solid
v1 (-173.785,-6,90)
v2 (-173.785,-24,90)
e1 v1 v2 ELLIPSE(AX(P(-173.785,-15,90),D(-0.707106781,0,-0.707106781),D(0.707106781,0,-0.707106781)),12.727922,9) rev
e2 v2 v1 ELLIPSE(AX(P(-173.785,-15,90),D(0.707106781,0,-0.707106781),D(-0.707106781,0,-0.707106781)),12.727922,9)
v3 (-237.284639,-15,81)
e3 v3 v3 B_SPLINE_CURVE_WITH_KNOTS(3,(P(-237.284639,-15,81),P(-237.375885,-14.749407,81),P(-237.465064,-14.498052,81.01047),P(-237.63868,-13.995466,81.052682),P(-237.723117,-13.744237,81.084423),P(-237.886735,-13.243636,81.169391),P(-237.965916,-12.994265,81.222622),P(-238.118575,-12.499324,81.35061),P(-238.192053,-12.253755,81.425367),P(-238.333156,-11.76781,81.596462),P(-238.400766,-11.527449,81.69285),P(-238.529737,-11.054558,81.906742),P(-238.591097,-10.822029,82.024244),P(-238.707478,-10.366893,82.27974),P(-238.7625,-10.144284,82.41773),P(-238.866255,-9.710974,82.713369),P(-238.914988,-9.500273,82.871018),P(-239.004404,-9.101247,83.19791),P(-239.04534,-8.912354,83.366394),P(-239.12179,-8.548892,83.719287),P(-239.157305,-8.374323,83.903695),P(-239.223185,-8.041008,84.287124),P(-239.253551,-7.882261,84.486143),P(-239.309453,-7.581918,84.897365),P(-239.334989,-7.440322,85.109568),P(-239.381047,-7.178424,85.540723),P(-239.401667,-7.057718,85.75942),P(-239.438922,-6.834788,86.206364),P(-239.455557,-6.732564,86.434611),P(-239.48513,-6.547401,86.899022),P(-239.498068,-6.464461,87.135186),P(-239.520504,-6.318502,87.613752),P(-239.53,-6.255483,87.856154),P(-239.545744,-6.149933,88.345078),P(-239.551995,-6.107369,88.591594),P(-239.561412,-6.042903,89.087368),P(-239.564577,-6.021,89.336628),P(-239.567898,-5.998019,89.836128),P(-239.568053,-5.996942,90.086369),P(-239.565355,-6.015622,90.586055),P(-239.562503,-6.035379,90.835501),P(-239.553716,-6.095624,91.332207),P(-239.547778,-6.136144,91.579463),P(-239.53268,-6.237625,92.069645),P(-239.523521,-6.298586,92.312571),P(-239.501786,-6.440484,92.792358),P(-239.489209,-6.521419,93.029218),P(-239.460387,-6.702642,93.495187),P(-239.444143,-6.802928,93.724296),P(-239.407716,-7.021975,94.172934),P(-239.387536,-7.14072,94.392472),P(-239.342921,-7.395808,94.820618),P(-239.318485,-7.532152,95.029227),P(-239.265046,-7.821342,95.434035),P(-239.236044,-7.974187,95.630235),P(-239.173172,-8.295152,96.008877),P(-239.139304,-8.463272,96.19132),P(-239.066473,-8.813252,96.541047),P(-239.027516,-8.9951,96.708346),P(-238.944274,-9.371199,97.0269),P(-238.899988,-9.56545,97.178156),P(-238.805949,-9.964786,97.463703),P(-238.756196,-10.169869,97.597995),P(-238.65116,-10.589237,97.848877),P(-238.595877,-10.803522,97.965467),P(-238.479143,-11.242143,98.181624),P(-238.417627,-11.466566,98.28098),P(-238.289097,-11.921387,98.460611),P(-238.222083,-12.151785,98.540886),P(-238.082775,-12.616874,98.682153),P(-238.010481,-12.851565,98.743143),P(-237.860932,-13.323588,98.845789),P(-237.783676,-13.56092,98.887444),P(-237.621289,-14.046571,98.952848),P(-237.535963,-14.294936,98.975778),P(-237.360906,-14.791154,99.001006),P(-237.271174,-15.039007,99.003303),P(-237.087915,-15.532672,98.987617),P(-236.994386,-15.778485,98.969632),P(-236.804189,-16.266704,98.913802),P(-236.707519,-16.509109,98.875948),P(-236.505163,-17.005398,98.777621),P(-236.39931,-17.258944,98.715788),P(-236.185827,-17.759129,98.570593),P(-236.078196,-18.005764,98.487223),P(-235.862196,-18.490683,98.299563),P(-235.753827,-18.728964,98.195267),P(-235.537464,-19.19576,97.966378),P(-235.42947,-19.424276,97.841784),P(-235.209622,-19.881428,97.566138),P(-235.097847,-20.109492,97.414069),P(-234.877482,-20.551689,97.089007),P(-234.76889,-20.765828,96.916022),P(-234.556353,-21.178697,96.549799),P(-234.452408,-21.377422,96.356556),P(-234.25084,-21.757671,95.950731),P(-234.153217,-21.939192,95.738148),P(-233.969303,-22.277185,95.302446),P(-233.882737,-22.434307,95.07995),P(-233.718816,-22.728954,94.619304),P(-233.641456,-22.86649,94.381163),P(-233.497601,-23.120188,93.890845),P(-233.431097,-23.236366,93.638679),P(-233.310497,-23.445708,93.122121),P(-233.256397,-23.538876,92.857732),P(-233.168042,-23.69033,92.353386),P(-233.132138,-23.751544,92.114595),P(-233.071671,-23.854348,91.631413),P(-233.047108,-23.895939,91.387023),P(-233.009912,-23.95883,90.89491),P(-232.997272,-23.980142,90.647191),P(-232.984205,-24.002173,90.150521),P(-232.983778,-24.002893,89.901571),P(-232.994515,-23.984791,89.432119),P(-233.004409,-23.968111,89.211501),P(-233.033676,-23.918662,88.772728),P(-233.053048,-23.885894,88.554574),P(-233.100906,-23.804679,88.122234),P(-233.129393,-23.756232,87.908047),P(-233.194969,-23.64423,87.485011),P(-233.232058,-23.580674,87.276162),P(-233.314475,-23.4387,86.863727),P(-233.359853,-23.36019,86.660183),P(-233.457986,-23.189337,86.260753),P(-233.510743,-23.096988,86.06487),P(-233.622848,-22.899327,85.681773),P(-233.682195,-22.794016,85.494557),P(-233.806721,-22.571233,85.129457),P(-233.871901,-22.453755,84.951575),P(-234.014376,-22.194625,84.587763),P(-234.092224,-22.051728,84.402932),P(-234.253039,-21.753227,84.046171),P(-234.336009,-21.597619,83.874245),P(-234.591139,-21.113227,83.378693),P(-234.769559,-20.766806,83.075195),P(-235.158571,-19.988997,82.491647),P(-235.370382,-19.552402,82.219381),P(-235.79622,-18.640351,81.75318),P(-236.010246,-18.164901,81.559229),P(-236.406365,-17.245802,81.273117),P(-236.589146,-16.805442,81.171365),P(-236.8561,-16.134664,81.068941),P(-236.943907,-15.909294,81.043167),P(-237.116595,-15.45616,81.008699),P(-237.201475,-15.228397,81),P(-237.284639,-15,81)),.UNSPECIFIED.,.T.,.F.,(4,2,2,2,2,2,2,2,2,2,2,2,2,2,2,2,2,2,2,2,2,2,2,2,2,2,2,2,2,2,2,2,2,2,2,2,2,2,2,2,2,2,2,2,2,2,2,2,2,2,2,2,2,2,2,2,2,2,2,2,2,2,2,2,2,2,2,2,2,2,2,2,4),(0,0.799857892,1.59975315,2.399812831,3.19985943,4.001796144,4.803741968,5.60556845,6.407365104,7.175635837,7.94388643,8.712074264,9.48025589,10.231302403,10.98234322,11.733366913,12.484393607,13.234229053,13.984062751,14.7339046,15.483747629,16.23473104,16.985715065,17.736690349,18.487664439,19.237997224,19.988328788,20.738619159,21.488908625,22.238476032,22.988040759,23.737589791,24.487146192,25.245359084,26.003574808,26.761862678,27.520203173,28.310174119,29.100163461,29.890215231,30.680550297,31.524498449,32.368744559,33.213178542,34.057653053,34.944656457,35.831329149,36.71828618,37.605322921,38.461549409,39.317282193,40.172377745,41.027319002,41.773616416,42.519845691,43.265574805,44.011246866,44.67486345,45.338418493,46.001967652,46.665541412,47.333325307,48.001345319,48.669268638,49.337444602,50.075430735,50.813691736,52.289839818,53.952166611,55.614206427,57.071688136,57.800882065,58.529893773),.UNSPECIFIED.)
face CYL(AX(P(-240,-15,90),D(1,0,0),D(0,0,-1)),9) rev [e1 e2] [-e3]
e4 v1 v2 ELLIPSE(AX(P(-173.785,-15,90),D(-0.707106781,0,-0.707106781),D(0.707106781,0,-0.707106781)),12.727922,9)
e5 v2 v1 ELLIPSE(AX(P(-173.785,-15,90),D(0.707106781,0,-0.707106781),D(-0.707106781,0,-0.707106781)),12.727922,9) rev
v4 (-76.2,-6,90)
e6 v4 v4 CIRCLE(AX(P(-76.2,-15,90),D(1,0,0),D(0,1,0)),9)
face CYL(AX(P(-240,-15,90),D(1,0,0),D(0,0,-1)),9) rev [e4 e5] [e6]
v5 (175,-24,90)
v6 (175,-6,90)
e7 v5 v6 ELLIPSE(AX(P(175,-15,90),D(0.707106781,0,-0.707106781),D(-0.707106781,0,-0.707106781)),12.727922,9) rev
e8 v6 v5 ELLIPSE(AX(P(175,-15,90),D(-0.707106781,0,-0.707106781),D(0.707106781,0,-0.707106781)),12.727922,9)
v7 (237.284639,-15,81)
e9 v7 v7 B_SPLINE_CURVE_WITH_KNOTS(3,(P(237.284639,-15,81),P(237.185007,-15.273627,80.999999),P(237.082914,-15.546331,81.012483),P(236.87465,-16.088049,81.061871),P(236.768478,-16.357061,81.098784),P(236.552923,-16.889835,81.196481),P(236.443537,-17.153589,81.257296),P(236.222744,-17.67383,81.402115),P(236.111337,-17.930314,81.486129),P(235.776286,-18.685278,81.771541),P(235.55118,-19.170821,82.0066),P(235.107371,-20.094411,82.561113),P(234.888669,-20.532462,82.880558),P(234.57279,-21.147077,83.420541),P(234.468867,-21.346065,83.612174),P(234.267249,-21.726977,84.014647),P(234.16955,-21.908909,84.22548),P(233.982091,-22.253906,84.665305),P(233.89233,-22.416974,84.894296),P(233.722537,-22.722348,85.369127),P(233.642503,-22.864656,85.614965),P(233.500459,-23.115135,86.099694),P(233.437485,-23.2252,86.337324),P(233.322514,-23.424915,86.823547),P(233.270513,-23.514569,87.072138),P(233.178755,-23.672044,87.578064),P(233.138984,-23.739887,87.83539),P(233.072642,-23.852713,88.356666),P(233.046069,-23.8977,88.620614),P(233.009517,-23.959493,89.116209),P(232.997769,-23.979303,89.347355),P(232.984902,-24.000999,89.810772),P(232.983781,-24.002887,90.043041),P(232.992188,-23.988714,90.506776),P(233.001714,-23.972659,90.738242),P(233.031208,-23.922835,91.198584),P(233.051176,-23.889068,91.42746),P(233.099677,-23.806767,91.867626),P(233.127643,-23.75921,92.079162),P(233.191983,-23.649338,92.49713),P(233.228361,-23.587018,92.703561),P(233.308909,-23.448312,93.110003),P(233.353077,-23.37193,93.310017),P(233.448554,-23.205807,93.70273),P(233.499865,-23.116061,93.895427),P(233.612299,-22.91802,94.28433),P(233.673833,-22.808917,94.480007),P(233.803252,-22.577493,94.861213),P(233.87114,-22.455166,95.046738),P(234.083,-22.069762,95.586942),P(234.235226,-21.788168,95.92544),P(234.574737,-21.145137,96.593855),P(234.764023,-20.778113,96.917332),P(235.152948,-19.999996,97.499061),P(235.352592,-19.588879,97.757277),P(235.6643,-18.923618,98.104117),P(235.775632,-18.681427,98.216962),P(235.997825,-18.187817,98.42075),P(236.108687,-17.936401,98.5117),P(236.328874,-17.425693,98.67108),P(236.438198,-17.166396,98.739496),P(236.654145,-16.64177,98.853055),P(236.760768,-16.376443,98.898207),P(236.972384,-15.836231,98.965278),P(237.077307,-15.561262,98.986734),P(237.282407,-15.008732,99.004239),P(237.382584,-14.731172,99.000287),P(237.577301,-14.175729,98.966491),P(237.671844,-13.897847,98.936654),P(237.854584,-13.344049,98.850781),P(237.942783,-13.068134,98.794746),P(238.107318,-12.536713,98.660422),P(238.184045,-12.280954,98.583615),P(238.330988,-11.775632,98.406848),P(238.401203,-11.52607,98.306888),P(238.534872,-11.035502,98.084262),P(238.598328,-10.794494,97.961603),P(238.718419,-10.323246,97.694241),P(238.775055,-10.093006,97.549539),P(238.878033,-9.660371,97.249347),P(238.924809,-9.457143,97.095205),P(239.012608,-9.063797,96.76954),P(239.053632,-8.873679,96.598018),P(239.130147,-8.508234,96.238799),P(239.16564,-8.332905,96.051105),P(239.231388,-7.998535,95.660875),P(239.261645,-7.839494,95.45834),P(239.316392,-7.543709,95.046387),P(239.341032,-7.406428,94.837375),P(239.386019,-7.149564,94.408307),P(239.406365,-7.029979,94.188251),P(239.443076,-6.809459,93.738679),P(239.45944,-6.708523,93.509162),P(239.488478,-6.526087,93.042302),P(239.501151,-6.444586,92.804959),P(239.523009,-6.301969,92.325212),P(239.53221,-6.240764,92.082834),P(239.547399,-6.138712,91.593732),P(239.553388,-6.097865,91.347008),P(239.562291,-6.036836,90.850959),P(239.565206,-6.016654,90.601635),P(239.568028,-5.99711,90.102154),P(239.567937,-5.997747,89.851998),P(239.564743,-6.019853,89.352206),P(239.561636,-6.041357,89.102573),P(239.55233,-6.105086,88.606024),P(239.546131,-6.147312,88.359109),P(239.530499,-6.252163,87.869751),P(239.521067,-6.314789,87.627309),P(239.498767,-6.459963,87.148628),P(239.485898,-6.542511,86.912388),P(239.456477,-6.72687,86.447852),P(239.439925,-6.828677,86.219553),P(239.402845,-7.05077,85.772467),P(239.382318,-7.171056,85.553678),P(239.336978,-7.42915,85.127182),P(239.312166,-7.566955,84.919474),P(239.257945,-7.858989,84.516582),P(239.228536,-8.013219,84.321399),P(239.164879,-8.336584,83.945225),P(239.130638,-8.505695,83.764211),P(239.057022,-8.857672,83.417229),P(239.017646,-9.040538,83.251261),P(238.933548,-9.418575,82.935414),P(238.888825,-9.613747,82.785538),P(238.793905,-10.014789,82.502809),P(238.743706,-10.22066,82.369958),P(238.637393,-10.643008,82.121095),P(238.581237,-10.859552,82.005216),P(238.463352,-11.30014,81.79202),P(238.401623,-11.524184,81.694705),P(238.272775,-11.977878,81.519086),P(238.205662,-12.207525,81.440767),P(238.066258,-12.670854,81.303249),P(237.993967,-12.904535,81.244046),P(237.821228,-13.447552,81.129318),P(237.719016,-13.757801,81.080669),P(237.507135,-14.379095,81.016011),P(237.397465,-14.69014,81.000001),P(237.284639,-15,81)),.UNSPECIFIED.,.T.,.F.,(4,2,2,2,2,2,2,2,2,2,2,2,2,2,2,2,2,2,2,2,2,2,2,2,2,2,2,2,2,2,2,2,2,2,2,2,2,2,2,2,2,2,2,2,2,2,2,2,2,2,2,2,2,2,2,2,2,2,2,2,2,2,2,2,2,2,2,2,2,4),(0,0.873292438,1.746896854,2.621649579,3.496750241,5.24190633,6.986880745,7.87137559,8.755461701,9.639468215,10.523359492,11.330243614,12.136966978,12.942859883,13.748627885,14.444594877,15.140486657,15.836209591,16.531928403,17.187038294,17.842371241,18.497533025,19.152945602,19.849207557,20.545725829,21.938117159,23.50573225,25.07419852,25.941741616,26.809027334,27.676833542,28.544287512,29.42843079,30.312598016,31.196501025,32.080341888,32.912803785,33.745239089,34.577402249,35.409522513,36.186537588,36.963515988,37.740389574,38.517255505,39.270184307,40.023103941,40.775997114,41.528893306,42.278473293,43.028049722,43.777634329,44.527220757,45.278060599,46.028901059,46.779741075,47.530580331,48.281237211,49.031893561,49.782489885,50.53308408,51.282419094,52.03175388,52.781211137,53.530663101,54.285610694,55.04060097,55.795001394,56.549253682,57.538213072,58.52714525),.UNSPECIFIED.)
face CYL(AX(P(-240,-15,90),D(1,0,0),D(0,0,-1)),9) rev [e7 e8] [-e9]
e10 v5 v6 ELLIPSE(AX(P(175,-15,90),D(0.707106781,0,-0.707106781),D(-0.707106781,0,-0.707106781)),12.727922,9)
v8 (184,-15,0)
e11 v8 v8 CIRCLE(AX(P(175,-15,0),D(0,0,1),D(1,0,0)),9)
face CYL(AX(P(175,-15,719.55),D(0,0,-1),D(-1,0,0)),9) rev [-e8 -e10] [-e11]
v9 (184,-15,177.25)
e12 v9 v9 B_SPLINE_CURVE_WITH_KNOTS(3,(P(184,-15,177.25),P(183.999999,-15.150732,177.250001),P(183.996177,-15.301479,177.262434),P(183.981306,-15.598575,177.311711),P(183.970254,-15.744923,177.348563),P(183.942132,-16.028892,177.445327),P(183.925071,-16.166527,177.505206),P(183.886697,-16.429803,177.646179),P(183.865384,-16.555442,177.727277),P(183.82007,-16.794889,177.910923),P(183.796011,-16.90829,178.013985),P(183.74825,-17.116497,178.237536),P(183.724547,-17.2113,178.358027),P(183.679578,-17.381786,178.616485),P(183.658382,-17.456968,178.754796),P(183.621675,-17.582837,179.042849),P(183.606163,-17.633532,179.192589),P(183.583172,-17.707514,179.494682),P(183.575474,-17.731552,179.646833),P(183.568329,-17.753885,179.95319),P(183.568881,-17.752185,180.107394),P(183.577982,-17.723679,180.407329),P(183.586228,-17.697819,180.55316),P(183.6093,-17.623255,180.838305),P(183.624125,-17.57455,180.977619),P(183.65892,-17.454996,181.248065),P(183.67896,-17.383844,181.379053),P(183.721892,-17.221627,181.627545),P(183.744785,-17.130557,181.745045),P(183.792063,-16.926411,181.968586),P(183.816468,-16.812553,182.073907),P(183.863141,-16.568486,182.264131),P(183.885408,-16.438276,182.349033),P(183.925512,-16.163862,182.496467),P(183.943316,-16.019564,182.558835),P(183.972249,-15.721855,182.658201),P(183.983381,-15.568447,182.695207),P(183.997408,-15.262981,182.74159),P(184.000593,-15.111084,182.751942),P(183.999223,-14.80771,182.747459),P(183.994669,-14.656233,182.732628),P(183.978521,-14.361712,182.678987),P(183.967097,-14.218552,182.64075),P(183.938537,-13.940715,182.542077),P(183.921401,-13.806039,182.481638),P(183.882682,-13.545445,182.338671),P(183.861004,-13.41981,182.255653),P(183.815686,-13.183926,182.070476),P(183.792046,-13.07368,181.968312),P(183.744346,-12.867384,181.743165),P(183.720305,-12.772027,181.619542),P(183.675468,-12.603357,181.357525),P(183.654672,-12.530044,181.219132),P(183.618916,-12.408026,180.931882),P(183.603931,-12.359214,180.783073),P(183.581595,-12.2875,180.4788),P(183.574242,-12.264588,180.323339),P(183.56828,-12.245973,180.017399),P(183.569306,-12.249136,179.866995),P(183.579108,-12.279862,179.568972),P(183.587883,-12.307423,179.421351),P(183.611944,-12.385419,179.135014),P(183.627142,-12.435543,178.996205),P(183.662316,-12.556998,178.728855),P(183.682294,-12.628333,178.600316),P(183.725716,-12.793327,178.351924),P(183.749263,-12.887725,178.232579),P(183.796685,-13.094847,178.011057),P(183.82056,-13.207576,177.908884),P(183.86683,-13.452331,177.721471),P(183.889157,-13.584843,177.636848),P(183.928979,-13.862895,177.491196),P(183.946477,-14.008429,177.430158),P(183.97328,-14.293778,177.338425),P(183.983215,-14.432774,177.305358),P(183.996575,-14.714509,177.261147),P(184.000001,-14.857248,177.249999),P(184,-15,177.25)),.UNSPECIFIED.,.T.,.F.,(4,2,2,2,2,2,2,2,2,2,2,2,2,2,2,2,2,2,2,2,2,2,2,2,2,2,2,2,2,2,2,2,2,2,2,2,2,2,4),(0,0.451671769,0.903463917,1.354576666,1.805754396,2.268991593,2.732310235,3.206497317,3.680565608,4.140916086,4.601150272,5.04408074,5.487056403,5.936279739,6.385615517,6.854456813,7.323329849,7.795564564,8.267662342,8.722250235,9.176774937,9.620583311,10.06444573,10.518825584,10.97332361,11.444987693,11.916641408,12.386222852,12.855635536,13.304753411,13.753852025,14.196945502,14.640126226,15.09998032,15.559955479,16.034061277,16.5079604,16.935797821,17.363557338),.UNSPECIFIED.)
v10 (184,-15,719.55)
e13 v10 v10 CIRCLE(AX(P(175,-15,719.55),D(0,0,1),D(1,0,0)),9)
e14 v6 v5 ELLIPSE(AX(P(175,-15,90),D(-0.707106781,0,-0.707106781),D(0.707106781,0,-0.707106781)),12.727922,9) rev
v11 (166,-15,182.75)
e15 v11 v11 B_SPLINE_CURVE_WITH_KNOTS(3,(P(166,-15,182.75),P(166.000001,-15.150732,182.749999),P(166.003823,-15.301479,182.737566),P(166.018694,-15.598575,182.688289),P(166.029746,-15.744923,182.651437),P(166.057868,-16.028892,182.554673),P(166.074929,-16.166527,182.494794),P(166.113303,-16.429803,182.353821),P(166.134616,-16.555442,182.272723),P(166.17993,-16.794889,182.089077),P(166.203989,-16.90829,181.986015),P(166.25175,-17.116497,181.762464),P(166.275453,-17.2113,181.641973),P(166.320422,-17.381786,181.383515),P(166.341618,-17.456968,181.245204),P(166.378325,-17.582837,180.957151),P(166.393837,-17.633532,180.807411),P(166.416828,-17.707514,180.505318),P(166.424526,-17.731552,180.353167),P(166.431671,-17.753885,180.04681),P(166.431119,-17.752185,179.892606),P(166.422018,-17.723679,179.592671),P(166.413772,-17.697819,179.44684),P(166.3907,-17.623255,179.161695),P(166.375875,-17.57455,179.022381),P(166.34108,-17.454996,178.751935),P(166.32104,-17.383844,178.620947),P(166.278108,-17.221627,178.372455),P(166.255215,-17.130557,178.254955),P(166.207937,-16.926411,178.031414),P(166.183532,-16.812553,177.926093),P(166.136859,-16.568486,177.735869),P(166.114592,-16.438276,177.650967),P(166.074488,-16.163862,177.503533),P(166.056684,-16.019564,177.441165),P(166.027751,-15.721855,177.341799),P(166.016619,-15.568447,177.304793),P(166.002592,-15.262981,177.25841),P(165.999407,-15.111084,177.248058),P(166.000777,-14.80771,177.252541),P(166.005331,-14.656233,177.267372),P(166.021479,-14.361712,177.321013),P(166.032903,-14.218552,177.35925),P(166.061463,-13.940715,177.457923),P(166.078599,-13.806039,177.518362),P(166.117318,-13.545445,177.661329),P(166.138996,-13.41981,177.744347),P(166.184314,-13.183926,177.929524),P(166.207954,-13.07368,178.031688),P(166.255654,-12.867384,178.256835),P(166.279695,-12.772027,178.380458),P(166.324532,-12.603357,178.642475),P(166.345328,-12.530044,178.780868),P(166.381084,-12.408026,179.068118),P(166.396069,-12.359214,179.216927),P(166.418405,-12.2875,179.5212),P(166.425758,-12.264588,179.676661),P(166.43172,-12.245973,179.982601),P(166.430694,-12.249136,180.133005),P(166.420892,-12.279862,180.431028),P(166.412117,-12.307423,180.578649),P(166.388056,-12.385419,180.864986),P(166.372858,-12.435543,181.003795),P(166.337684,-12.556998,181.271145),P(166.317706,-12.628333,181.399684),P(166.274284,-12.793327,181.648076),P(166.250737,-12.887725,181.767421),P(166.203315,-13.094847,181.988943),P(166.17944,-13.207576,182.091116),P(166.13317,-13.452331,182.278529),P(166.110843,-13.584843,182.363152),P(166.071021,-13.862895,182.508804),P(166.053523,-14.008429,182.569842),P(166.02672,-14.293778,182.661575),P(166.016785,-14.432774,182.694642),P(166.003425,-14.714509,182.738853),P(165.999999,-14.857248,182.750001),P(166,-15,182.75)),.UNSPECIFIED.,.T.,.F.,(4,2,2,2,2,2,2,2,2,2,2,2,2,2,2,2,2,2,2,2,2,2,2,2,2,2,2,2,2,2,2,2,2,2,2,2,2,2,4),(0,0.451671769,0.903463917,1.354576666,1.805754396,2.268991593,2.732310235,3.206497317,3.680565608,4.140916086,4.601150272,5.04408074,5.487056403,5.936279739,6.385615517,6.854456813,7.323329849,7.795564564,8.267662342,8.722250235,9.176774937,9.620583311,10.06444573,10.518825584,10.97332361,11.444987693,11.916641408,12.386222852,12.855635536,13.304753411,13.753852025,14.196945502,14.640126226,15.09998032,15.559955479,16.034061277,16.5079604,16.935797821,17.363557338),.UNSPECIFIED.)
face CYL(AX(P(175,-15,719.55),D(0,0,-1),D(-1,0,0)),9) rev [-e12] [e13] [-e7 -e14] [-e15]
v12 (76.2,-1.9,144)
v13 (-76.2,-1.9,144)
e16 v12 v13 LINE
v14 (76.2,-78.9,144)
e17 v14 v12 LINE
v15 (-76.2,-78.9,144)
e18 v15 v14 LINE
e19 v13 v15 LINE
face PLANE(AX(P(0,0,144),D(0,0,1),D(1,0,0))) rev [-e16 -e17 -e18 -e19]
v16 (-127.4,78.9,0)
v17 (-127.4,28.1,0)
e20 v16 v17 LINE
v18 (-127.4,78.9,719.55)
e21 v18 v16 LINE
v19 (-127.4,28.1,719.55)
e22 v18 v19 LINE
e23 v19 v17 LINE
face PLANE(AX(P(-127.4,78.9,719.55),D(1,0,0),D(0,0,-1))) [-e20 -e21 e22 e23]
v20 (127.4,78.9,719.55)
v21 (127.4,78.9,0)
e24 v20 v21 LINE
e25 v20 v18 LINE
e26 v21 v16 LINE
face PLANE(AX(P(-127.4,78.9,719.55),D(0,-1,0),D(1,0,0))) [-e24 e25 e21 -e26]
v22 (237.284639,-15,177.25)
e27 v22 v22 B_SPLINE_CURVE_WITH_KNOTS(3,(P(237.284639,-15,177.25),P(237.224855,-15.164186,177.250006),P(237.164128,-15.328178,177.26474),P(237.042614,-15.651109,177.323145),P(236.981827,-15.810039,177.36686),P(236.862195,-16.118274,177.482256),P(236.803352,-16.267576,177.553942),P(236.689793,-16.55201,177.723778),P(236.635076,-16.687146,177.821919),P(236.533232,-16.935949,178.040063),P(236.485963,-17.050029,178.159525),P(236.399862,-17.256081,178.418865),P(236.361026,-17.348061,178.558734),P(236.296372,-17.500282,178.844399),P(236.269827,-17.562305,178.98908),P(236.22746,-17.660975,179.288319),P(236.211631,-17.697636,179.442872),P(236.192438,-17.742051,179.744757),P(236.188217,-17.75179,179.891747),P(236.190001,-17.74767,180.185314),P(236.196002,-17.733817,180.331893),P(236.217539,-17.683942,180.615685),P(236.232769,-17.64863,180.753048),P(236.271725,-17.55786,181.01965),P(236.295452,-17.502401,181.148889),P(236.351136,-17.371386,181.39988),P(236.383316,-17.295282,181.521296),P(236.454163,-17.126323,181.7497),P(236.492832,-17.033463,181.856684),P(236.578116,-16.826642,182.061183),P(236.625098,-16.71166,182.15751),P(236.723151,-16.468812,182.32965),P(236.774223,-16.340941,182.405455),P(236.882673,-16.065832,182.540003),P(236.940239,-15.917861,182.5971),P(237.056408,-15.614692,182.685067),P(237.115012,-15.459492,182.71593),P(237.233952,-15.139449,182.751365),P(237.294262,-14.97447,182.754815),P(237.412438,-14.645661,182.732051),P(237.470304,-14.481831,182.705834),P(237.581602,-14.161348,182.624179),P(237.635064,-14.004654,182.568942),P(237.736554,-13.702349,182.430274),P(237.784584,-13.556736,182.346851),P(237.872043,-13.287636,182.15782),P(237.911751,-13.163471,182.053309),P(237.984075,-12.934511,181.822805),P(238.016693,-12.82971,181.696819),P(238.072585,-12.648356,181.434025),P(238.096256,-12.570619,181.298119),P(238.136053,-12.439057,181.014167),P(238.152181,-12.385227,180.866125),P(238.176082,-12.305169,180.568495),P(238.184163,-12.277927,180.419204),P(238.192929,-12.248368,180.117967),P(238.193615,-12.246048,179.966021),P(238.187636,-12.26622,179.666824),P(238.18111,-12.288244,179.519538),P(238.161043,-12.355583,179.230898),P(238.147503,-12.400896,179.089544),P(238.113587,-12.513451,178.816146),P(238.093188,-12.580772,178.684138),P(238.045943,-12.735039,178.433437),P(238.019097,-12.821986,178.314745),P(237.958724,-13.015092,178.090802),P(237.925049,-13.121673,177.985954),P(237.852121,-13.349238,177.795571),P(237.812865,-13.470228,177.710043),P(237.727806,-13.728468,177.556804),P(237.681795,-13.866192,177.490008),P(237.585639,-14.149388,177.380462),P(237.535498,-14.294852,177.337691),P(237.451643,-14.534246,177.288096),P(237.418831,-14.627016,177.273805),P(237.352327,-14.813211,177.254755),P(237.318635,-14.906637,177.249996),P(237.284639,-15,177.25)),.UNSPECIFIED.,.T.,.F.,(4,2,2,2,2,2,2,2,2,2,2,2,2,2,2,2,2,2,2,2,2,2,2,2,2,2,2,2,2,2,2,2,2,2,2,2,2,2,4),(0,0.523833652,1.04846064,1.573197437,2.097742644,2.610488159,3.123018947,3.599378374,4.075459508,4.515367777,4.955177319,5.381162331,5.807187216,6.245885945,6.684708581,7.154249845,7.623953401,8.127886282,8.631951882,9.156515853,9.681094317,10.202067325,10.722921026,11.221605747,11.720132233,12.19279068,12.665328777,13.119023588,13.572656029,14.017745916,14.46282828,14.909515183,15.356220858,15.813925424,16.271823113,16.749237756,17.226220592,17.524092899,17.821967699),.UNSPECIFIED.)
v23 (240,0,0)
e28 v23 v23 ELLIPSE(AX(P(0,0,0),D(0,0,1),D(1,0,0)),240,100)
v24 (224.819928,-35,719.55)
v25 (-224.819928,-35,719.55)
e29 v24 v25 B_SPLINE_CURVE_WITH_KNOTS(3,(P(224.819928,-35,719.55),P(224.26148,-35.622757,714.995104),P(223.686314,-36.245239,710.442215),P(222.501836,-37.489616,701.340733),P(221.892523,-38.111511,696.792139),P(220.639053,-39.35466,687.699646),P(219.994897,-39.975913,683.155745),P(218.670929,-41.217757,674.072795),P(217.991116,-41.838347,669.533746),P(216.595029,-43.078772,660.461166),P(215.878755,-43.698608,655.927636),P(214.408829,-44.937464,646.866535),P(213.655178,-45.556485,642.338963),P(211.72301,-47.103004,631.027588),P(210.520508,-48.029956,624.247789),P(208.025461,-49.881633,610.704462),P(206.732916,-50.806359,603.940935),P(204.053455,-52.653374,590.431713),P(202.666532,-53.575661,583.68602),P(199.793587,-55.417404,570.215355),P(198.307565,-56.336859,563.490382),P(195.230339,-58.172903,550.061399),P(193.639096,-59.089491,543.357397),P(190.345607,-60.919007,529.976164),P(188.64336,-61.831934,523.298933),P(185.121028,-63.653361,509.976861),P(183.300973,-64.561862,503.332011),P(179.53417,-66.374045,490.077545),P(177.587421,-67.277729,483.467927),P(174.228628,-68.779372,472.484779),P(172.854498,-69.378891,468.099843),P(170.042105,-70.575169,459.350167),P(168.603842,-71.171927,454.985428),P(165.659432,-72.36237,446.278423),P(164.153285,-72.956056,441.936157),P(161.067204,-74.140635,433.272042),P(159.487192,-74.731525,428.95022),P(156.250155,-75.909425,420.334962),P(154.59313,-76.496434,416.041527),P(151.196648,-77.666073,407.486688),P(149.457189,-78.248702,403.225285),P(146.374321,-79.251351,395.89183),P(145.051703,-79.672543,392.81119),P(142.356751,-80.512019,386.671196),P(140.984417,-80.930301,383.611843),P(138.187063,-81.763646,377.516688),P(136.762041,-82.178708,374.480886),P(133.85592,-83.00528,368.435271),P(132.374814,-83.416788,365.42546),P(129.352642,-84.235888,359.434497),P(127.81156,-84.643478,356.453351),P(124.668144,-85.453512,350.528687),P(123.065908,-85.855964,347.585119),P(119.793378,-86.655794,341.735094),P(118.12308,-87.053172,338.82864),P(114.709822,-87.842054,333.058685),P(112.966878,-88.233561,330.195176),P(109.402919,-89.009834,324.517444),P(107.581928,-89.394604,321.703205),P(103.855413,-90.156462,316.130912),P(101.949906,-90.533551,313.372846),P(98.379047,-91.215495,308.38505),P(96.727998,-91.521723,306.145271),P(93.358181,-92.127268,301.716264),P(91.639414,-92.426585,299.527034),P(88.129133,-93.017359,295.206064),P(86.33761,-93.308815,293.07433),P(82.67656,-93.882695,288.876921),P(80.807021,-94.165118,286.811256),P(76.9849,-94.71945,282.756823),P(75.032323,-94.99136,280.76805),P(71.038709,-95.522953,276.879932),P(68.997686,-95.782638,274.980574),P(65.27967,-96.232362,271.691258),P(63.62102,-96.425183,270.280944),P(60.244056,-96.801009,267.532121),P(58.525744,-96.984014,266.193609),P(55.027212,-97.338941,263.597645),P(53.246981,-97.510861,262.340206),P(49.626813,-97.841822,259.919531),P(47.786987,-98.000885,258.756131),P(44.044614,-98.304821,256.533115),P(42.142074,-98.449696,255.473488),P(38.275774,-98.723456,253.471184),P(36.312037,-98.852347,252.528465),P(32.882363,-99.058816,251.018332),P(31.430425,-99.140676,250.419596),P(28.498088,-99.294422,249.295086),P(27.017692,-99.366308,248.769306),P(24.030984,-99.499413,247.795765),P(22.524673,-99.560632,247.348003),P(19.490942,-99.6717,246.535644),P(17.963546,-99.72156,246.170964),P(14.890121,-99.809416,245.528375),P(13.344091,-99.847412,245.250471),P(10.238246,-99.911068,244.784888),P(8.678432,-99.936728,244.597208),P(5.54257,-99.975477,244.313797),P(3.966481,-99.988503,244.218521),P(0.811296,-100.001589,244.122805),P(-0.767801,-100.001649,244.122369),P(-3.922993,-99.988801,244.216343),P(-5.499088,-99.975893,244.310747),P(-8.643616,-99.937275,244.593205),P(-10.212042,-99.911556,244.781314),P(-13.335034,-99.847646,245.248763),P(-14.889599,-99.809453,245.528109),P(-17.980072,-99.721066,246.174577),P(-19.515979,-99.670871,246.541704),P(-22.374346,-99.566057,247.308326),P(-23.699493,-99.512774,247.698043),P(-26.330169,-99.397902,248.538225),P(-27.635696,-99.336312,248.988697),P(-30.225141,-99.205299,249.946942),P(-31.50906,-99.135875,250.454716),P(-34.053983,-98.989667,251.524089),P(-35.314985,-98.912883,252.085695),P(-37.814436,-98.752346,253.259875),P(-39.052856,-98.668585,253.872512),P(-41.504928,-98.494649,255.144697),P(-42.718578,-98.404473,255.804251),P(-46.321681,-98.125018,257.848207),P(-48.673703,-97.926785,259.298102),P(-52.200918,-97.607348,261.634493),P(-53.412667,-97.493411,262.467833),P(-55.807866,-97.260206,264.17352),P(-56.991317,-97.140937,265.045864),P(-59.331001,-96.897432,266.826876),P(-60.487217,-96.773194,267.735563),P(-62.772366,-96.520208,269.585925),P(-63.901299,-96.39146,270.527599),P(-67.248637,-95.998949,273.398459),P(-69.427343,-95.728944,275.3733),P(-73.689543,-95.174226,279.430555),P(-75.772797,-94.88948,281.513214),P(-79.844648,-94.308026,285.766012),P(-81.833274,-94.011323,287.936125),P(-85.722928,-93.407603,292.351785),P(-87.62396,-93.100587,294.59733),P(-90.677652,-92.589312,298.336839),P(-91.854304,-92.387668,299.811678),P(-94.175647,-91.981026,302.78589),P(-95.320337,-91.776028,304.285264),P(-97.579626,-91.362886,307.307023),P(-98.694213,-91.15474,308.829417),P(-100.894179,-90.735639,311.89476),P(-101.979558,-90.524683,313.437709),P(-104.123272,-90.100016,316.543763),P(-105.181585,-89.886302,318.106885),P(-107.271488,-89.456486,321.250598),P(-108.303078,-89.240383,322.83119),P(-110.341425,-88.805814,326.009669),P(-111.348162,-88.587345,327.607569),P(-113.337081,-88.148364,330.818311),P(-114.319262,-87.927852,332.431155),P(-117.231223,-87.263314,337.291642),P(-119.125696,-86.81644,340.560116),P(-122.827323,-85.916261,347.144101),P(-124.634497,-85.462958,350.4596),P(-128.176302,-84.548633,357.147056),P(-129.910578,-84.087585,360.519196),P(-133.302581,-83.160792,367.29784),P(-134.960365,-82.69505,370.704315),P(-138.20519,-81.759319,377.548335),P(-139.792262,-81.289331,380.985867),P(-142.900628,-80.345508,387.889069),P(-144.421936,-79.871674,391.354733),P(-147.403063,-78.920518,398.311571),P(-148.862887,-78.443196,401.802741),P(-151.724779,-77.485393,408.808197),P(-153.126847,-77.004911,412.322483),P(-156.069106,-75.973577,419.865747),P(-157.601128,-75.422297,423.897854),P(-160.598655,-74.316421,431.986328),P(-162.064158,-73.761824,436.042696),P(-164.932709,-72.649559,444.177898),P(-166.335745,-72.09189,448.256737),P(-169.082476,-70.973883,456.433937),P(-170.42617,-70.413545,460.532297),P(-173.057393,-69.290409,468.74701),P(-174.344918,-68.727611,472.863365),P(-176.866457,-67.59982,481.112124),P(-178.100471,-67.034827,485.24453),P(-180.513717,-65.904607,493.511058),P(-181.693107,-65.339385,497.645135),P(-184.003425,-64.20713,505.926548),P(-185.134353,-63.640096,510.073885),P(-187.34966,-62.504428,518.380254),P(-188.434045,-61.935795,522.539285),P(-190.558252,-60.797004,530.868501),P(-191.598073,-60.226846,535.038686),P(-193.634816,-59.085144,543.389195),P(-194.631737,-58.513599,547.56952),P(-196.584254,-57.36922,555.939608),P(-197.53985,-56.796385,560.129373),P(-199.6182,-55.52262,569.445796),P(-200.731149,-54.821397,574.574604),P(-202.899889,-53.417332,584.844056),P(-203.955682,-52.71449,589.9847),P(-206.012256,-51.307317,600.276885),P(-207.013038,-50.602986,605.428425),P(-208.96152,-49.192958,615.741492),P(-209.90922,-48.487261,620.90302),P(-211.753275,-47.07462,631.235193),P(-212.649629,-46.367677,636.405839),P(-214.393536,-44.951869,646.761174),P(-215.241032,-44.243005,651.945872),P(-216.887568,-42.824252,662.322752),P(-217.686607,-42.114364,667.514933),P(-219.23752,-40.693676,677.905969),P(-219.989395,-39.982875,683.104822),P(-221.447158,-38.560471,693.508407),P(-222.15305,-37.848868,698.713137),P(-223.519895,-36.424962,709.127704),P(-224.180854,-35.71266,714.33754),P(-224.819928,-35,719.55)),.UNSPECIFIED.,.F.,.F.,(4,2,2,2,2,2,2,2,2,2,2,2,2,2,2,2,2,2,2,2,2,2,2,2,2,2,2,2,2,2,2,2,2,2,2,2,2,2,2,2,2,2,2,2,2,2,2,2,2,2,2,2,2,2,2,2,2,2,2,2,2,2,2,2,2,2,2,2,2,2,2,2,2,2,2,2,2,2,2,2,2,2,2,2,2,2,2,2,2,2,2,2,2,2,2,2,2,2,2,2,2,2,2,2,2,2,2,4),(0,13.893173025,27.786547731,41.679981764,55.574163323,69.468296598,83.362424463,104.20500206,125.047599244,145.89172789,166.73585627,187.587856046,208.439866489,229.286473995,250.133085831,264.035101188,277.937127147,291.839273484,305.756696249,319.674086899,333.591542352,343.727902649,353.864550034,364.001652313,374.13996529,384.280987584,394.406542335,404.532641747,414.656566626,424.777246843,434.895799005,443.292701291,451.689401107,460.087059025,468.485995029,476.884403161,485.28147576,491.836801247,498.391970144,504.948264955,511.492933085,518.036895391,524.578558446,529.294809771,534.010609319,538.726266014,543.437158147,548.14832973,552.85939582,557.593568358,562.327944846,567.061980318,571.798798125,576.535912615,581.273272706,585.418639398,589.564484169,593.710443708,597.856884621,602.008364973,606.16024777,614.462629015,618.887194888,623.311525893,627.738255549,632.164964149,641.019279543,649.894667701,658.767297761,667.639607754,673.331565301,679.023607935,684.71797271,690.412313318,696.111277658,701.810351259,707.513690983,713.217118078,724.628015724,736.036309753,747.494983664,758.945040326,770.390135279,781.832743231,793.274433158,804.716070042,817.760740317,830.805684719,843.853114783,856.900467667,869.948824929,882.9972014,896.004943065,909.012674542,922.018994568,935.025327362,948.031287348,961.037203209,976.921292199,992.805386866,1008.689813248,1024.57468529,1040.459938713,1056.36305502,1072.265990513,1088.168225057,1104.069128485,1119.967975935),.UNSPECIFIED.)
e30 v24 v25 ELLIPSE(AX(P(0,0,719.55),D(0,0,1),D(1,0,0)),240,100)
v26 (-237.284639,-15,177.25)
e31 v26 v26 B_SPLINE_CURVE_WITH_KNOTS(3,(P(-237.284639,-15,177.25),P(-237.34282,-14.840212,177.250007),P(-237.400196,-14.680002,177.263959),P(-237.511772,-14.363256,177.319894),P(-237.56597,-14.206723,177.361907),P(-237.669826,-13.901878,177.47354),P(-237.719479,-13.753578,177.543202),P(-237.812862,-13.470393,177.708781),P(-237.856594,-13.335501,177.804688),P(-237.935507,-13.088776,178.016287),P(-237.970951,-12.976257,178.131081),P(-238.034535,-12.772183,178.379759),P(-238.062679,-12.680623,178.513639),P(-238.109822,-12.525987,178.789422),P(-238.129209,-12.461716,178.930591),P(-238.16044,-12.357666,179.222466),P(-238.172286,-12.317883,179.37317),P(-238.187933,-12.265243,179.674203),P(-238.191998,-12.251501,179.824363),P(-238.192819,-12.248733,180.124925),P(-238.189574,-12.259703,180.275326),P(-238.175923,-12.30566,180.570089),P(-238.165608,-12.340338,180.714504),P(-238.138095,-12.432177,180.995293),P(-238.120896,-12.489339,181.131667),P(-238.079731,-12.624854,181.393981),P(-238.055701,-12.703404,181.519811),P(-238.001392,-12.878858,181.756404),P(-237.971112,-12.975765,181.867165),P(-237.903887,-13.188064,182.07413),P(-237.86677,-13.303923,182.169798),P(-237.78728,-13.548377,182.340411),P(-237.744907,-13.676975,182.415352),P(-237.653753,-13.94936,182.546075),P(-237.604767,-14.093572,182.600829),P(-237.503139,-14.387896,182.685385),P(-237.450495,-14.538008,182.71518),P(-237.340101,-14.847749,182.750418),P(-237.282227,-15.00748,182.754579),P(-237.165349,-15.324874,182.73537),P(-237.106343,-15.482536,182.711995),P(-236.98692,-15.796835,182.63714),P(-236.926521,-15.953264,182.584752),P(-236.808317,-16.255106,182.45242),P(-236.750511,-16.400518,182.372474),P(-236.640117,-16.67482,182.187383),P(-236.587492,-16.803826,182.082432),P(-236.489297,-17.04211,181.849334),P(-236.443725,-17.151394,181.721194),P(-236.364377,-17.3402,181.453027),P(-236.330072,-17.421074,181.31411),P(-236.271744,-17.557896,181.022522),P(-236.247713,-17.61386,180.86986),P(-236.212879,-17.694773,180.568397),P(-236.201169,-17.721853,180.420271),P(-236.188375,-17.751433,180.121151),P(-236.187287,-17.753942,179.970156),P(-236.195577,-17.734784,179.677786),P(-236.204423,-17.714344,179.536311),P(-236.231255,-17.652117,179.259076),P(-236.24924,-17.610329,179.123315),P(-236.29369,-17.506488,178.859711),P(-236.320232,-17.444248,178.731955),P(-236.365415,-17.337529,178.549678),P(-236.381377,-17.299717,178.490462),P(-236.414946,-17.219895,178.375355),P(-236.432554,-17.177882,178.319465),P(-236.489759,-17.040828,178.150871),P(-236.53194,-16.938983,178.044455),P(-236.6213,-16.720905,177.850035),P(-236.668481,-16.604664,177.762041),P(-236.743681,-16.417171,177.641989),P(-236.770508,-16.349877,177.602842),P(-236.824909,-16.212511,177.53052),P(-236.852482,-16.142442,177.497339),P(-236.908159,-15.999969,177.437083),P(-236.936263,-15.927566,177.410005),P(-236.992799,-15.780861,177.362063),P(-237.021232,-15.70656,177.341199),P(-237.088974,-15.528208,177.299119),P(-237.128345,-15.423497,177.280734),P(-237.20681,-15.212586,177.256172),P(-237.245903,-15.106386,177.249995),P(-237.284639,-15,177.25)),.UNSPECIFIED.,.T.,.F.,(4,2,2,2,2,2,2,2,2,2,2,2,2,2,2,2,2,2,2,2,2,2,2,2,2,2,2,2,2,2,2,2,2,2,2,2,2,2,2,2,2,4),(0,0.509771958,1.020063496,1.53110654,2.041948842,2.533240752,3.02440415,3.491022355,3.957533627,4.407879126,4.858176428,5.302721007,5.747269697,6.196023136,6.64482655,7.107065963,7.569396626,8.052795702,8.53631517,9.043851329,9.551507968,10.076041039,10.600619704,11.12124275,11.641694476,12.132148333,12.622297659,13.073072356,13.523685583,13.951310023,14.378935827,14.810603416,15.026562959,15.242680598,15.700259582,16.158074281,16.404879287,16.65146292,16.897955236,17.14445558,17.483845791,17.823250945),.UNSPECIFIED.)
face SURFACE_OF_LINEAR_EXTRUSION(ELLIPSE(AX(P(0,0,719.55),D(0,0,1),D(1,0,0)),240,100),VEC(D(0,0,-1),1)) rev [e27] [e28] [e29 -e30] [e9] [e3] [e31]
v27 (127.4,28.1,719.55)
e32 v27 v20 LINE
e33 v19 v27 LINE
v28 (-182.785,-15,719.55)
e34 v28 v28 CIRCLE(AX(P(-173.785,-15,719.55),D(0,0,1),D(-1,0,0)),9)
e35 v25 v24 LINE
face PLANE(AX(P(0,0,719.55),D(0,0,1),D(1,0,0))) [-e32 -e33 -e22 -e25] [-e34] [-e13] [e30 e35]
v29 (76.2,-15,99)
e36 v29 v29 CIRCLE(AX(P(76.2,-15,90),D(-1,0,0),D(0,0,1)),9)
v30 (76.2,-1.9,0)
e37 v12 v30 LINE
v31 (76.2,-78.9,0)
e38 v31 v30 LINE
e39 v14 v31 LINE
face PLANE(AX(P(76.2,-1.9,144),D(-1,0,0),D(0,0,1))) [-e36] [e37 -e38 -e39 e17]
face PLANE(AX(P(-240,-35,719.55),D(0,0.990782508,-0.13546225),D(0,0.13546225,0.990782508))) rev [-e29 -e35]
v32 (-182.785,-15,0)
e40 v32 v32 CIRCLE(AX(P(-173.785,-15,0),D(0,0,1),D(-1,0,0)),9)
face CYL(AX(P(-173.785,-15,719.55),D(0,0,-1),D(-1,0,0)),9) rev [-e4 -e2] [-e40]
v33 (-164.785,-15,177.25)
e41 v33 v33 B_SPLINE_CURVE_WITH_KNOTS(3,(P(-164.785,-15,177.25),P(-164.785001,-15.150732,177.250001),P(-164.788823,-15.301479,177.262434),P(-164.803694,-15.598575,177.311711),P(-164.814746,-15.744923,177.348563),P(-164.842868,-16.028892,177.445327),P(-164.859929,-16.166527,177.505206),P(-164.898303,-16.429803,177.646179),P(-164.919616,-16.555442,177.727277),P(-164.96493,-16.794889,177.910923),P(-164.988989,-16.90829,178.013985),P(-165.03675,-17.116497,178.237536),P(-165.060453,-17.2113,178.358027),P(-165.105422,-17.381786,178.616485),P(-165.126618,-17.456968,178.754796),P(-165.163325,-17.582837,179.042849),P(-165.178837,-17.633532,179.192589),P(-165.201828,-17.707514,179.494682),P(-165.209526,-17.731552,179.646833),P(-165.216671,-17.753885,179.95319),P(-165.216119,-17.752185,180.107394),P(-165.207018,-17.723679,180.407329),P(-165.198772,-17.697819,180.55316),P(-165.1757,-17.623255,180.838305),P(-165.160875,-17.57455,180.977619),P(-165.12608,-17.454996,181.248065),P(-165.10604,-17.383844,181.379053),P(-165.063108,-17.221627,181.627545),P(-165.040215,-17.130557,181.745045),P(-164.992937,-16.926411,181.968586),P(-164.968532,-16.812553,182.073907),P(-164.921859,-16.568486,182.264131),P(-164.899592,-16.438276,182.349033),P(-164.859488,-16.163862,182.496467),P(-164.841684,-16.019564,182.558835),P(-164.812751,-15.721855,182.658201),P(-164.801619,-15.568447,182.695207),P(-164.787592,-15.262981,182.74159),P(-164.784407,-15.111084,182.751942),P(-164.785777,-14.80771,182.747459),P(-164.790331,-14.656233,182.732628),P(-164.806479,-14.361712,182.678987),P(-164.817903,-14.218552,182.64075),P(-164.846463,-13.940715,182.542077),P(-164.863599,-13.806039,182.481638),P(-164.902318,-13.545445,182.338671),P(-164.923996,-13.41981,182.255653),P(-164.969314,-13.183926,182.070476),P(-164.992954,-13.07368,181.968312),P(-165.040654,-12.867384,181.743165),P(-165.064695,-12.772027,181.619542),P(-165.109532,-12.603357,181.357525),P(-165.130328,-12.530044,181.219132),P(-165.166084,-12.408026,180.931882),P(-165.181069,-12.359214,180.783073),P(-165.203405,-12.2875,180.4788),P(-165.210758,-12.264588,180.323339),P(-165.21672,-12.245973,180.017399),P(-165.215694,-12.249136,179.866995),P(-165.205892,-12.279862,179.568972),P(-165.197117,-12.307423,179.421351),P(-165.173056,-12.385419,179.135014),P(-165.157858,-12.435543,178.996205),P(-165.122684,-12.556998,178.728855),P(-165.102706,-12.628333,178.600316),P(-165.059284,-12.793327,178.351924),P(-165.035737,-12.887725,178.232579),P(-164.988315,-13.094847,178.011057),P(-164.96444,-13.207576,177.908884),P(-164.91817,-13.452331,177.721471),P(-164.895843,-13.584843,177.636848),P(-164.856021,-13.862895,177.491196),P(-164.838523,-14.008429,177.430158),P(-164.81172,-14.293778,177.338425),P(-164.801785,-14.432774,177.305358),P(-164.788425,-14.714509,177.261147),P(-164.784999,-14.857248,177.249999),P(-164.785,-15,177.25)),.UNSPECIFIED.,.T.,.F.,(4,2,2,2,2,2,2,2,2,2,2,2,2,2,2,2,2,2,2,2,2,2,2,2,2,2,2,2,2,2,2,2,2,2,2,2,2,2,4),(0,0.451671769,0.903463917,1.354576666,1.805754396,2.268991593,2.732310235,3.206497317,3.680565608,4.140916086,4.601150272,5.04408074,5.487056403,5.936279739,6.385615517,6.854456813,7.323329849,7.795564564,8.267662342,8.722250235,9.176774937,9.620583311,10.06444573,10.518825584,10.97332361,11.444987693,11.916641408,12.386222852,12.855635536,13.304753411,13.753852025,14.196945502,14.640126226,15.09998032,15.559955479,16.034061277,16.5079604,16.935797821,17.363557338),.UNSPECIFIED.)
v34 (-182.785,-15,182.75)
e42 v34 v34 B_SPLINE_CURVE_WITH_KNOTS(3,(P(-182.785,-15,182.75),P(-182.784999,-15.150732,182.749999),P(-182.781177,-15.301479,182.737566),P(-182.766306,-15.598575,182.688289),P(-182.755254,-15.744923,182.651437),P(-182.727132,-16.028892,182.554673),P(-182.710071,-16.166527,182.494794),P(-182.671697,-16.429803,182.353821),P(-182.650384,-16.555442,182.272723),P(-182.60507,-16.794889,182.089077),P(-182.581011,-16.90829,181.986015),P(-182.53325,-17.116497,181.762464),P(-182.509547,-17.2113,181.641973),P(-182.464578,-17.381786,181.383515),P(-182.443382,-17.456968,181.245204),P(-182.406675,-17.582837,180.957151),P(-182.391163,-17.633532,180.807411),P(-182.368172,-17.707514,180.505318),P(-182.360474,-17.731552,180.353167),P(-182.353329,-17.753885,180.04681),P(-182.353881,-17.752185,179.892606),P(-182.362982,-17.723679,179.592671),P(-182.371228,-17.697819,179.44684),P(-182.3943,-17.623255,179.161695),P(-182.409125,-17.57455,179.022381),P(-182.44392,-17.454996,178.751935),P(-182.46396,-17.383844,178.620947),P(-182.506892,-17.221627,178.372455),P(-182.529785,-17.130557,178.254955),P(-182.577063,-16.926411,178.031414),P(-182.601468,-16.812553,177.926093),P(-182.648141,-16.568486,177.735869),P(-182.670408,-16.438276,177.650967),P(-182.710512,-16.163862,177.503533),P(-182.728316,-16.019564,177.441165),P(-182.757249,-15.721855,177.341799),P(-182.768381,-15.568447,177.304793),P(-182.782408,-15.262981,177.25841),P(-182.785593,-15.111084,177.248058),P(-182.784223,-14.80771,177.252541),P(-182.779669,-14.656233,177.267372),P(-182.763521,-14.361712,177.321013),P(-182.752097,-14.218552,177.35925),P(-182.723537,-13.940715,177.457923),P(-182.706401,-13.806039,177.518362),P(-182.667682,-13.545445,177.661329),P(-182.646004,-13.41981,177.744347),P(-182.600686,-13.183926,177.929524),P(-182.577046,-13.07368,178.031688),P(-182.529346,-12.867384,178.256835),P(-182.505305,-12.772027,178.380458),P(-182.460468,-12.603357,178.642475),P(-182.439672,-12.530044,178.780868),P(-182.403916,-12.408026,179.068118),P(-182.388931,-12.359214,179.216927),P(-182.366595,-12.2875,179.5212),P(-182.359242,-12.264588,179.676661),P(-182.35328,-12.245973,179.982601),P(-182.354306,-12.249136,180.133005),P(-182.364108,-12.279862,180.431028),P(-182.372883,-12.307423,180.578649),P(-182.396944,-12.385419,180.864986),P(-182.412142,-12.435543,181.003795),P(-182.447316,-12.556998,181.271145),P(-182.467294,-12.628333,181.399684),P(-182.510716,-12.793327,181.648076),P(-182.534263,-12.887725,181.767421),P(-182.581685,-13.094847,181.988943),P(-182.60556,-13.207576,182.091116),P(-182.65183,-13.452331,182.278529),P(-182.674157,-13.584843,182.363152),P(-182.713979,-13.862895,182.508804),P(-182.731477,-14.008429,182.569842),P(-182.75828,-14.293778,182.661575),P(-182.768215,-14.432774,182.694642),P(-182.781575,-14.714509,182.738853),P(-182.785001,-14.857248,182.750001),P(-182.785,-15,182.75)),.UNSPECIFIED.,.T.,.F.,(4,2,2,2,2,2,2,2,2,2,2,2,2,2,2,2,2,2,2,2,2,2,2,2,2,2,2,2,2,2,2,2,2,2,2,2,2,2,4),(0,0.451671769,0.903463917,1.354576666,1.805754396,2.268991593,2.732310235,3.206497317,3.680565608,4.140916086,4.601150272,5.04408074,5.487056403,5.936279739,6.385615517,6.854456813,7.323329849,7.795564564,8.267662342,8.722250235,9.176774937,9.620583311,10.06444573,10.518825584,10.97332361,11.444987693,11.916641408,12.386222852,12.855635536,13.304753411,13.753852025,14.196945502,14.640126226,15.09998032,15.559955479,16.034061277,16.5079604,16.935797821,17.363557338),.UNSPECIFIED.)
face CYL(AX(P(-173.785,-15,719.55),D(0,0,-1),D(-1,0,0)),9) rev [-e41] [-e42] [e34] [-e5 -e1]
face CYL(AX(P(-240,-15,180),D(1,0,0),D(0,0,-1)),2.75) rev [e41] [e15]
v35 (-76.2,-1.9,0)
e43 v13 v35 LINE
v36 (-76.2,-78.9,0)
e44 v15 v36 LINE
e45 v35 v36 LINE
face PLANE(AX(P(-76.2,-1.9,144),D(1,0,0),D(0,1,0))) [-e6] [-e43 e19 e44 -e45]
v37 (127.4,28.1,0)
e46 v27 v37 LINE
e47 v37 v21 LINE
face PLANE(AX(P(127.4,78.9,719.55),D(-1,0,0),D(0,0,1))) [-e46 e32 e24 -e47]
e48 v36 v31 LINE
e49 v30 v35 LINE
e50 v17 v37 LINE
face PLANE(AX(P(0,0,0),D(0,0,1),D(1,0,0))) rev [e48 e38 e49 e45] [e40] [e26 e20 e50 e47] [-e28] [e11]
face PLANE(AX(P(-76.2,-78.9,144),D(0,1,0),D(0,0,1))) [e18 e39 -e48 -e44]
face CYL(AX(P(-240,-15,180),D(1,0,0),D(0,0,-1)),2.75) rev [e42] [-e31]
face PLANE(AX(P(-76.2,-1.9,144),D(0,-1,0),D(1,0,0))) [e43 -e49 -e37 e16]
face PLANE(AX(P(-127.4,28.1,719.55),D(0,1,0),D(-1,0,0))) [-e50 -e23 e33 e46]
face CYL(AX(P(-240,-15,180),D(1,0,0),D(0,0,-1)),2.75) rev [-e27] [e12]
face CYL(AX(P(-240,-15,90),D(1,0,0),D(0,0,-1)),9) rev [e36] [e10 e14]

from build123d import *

# Parameters (mm, degrees)
SKETCH1_RX               = 240
SKETCH1_RY               = 100
SKETCH1_R                = 9
SKETCH1_W                = 254.8
SKETCH1_H                = 50.8
BOSS_EXTRUDE1_DEPTH      = 719.55
CUT_EXTRUDE1_DEPTH       = 766.083134372
CUT_EXTRUDE1_DEPTH_BACK  = 766.083134372
SKETCH7_W                = 152.4
SKETCH7_H                = 77
CUT_EXTRUDE2_DEPTH       = 144
CUT_EXTRUDE3_START       = -241
CUT_EXTRUDE3_OUTLINE_R   = 9
CUT_EXTRUDE3_OUTLINE_R_2 = 2.75
CUT_EXTRUDE3_DEPTH       = 482


with BuildPart() as part:
    # Sketch1 → Boss-Extrude1 (new body)
    with BuildSketch(Plane.XY):
        with Locations((0, 0)):
            Ellipse(SKETCH1_RX, SKETCH1_RY)
        with Locations((175, -15)):
            Circle(SKETCH1_R, mode=Mode.SUBTRACT)
        with Locations(Location((-173.785, -15, 0), (0, 0, 180))):
            Circle(SKETCH1_R, mode=Mode.SUBTRACT)
        with Locations((0, 53.5)):
            Rectangle(SKETCH1_W, SKETCH1_H, mode=Mode.SUBTRACT)
    extrude(amount=BOSS_EXTRUDE1_DEPTH)

    # Sketch3 → Cut-Extrude1 (cut, two sides: drawn at the far end of the back side and taken through both)
    with BuildSketch(Plane(origin=(0, 0, 0), x_dir=(0, 0, -1), z_dir=(1, 0, 0)).offset(-CUT_EXTRUDE1_DEPTH_BACK)):
        Polygon((-719.55, -100), (-719.55, -35), (-244.134429793, -100), align=None)
    extrude(amount=CUT_EXTRUDE1_DEPTH + CUT_EXTRUDE1_DEPTH_BACK, mode=Mode.SUBTRACT)

    # Sketch7 → Cut-Extrude2 (cut)
    with BuildSketch(Plane.XY):
        with Locations((0, -40.4)):
            Rectangle(SKETCH7_W, SKETCH7_H)
    extrude(amount=CUT_EXTRUDE2_DEPTH, mode=Mode.SUBTRACT)

    # Cut-Extrude3: read off the stored shape, not the designer's step
    # Cut-Extrude3 outline → Cut-Extrude3 (cut)
    with BuildSketch(Plane(origin=(0, 0, 0), x_dir=(0, 0, -1), z_dir=(1, 0, 0)).offset(CUT_EXTRUDE3_START)):
        with Locations((-90, -15)):
            Circle(CUT_EXTRUDE3_OUTLINE_R)
        with Locations((-180, -15)):
            Circle(CUT_EXTRUDE3_OUTLINE_R_2)
    extrude(amount=CUT_EXTRUDE3_DEPTH, mode=Mode.SUBTRACT)


solid = part.part
